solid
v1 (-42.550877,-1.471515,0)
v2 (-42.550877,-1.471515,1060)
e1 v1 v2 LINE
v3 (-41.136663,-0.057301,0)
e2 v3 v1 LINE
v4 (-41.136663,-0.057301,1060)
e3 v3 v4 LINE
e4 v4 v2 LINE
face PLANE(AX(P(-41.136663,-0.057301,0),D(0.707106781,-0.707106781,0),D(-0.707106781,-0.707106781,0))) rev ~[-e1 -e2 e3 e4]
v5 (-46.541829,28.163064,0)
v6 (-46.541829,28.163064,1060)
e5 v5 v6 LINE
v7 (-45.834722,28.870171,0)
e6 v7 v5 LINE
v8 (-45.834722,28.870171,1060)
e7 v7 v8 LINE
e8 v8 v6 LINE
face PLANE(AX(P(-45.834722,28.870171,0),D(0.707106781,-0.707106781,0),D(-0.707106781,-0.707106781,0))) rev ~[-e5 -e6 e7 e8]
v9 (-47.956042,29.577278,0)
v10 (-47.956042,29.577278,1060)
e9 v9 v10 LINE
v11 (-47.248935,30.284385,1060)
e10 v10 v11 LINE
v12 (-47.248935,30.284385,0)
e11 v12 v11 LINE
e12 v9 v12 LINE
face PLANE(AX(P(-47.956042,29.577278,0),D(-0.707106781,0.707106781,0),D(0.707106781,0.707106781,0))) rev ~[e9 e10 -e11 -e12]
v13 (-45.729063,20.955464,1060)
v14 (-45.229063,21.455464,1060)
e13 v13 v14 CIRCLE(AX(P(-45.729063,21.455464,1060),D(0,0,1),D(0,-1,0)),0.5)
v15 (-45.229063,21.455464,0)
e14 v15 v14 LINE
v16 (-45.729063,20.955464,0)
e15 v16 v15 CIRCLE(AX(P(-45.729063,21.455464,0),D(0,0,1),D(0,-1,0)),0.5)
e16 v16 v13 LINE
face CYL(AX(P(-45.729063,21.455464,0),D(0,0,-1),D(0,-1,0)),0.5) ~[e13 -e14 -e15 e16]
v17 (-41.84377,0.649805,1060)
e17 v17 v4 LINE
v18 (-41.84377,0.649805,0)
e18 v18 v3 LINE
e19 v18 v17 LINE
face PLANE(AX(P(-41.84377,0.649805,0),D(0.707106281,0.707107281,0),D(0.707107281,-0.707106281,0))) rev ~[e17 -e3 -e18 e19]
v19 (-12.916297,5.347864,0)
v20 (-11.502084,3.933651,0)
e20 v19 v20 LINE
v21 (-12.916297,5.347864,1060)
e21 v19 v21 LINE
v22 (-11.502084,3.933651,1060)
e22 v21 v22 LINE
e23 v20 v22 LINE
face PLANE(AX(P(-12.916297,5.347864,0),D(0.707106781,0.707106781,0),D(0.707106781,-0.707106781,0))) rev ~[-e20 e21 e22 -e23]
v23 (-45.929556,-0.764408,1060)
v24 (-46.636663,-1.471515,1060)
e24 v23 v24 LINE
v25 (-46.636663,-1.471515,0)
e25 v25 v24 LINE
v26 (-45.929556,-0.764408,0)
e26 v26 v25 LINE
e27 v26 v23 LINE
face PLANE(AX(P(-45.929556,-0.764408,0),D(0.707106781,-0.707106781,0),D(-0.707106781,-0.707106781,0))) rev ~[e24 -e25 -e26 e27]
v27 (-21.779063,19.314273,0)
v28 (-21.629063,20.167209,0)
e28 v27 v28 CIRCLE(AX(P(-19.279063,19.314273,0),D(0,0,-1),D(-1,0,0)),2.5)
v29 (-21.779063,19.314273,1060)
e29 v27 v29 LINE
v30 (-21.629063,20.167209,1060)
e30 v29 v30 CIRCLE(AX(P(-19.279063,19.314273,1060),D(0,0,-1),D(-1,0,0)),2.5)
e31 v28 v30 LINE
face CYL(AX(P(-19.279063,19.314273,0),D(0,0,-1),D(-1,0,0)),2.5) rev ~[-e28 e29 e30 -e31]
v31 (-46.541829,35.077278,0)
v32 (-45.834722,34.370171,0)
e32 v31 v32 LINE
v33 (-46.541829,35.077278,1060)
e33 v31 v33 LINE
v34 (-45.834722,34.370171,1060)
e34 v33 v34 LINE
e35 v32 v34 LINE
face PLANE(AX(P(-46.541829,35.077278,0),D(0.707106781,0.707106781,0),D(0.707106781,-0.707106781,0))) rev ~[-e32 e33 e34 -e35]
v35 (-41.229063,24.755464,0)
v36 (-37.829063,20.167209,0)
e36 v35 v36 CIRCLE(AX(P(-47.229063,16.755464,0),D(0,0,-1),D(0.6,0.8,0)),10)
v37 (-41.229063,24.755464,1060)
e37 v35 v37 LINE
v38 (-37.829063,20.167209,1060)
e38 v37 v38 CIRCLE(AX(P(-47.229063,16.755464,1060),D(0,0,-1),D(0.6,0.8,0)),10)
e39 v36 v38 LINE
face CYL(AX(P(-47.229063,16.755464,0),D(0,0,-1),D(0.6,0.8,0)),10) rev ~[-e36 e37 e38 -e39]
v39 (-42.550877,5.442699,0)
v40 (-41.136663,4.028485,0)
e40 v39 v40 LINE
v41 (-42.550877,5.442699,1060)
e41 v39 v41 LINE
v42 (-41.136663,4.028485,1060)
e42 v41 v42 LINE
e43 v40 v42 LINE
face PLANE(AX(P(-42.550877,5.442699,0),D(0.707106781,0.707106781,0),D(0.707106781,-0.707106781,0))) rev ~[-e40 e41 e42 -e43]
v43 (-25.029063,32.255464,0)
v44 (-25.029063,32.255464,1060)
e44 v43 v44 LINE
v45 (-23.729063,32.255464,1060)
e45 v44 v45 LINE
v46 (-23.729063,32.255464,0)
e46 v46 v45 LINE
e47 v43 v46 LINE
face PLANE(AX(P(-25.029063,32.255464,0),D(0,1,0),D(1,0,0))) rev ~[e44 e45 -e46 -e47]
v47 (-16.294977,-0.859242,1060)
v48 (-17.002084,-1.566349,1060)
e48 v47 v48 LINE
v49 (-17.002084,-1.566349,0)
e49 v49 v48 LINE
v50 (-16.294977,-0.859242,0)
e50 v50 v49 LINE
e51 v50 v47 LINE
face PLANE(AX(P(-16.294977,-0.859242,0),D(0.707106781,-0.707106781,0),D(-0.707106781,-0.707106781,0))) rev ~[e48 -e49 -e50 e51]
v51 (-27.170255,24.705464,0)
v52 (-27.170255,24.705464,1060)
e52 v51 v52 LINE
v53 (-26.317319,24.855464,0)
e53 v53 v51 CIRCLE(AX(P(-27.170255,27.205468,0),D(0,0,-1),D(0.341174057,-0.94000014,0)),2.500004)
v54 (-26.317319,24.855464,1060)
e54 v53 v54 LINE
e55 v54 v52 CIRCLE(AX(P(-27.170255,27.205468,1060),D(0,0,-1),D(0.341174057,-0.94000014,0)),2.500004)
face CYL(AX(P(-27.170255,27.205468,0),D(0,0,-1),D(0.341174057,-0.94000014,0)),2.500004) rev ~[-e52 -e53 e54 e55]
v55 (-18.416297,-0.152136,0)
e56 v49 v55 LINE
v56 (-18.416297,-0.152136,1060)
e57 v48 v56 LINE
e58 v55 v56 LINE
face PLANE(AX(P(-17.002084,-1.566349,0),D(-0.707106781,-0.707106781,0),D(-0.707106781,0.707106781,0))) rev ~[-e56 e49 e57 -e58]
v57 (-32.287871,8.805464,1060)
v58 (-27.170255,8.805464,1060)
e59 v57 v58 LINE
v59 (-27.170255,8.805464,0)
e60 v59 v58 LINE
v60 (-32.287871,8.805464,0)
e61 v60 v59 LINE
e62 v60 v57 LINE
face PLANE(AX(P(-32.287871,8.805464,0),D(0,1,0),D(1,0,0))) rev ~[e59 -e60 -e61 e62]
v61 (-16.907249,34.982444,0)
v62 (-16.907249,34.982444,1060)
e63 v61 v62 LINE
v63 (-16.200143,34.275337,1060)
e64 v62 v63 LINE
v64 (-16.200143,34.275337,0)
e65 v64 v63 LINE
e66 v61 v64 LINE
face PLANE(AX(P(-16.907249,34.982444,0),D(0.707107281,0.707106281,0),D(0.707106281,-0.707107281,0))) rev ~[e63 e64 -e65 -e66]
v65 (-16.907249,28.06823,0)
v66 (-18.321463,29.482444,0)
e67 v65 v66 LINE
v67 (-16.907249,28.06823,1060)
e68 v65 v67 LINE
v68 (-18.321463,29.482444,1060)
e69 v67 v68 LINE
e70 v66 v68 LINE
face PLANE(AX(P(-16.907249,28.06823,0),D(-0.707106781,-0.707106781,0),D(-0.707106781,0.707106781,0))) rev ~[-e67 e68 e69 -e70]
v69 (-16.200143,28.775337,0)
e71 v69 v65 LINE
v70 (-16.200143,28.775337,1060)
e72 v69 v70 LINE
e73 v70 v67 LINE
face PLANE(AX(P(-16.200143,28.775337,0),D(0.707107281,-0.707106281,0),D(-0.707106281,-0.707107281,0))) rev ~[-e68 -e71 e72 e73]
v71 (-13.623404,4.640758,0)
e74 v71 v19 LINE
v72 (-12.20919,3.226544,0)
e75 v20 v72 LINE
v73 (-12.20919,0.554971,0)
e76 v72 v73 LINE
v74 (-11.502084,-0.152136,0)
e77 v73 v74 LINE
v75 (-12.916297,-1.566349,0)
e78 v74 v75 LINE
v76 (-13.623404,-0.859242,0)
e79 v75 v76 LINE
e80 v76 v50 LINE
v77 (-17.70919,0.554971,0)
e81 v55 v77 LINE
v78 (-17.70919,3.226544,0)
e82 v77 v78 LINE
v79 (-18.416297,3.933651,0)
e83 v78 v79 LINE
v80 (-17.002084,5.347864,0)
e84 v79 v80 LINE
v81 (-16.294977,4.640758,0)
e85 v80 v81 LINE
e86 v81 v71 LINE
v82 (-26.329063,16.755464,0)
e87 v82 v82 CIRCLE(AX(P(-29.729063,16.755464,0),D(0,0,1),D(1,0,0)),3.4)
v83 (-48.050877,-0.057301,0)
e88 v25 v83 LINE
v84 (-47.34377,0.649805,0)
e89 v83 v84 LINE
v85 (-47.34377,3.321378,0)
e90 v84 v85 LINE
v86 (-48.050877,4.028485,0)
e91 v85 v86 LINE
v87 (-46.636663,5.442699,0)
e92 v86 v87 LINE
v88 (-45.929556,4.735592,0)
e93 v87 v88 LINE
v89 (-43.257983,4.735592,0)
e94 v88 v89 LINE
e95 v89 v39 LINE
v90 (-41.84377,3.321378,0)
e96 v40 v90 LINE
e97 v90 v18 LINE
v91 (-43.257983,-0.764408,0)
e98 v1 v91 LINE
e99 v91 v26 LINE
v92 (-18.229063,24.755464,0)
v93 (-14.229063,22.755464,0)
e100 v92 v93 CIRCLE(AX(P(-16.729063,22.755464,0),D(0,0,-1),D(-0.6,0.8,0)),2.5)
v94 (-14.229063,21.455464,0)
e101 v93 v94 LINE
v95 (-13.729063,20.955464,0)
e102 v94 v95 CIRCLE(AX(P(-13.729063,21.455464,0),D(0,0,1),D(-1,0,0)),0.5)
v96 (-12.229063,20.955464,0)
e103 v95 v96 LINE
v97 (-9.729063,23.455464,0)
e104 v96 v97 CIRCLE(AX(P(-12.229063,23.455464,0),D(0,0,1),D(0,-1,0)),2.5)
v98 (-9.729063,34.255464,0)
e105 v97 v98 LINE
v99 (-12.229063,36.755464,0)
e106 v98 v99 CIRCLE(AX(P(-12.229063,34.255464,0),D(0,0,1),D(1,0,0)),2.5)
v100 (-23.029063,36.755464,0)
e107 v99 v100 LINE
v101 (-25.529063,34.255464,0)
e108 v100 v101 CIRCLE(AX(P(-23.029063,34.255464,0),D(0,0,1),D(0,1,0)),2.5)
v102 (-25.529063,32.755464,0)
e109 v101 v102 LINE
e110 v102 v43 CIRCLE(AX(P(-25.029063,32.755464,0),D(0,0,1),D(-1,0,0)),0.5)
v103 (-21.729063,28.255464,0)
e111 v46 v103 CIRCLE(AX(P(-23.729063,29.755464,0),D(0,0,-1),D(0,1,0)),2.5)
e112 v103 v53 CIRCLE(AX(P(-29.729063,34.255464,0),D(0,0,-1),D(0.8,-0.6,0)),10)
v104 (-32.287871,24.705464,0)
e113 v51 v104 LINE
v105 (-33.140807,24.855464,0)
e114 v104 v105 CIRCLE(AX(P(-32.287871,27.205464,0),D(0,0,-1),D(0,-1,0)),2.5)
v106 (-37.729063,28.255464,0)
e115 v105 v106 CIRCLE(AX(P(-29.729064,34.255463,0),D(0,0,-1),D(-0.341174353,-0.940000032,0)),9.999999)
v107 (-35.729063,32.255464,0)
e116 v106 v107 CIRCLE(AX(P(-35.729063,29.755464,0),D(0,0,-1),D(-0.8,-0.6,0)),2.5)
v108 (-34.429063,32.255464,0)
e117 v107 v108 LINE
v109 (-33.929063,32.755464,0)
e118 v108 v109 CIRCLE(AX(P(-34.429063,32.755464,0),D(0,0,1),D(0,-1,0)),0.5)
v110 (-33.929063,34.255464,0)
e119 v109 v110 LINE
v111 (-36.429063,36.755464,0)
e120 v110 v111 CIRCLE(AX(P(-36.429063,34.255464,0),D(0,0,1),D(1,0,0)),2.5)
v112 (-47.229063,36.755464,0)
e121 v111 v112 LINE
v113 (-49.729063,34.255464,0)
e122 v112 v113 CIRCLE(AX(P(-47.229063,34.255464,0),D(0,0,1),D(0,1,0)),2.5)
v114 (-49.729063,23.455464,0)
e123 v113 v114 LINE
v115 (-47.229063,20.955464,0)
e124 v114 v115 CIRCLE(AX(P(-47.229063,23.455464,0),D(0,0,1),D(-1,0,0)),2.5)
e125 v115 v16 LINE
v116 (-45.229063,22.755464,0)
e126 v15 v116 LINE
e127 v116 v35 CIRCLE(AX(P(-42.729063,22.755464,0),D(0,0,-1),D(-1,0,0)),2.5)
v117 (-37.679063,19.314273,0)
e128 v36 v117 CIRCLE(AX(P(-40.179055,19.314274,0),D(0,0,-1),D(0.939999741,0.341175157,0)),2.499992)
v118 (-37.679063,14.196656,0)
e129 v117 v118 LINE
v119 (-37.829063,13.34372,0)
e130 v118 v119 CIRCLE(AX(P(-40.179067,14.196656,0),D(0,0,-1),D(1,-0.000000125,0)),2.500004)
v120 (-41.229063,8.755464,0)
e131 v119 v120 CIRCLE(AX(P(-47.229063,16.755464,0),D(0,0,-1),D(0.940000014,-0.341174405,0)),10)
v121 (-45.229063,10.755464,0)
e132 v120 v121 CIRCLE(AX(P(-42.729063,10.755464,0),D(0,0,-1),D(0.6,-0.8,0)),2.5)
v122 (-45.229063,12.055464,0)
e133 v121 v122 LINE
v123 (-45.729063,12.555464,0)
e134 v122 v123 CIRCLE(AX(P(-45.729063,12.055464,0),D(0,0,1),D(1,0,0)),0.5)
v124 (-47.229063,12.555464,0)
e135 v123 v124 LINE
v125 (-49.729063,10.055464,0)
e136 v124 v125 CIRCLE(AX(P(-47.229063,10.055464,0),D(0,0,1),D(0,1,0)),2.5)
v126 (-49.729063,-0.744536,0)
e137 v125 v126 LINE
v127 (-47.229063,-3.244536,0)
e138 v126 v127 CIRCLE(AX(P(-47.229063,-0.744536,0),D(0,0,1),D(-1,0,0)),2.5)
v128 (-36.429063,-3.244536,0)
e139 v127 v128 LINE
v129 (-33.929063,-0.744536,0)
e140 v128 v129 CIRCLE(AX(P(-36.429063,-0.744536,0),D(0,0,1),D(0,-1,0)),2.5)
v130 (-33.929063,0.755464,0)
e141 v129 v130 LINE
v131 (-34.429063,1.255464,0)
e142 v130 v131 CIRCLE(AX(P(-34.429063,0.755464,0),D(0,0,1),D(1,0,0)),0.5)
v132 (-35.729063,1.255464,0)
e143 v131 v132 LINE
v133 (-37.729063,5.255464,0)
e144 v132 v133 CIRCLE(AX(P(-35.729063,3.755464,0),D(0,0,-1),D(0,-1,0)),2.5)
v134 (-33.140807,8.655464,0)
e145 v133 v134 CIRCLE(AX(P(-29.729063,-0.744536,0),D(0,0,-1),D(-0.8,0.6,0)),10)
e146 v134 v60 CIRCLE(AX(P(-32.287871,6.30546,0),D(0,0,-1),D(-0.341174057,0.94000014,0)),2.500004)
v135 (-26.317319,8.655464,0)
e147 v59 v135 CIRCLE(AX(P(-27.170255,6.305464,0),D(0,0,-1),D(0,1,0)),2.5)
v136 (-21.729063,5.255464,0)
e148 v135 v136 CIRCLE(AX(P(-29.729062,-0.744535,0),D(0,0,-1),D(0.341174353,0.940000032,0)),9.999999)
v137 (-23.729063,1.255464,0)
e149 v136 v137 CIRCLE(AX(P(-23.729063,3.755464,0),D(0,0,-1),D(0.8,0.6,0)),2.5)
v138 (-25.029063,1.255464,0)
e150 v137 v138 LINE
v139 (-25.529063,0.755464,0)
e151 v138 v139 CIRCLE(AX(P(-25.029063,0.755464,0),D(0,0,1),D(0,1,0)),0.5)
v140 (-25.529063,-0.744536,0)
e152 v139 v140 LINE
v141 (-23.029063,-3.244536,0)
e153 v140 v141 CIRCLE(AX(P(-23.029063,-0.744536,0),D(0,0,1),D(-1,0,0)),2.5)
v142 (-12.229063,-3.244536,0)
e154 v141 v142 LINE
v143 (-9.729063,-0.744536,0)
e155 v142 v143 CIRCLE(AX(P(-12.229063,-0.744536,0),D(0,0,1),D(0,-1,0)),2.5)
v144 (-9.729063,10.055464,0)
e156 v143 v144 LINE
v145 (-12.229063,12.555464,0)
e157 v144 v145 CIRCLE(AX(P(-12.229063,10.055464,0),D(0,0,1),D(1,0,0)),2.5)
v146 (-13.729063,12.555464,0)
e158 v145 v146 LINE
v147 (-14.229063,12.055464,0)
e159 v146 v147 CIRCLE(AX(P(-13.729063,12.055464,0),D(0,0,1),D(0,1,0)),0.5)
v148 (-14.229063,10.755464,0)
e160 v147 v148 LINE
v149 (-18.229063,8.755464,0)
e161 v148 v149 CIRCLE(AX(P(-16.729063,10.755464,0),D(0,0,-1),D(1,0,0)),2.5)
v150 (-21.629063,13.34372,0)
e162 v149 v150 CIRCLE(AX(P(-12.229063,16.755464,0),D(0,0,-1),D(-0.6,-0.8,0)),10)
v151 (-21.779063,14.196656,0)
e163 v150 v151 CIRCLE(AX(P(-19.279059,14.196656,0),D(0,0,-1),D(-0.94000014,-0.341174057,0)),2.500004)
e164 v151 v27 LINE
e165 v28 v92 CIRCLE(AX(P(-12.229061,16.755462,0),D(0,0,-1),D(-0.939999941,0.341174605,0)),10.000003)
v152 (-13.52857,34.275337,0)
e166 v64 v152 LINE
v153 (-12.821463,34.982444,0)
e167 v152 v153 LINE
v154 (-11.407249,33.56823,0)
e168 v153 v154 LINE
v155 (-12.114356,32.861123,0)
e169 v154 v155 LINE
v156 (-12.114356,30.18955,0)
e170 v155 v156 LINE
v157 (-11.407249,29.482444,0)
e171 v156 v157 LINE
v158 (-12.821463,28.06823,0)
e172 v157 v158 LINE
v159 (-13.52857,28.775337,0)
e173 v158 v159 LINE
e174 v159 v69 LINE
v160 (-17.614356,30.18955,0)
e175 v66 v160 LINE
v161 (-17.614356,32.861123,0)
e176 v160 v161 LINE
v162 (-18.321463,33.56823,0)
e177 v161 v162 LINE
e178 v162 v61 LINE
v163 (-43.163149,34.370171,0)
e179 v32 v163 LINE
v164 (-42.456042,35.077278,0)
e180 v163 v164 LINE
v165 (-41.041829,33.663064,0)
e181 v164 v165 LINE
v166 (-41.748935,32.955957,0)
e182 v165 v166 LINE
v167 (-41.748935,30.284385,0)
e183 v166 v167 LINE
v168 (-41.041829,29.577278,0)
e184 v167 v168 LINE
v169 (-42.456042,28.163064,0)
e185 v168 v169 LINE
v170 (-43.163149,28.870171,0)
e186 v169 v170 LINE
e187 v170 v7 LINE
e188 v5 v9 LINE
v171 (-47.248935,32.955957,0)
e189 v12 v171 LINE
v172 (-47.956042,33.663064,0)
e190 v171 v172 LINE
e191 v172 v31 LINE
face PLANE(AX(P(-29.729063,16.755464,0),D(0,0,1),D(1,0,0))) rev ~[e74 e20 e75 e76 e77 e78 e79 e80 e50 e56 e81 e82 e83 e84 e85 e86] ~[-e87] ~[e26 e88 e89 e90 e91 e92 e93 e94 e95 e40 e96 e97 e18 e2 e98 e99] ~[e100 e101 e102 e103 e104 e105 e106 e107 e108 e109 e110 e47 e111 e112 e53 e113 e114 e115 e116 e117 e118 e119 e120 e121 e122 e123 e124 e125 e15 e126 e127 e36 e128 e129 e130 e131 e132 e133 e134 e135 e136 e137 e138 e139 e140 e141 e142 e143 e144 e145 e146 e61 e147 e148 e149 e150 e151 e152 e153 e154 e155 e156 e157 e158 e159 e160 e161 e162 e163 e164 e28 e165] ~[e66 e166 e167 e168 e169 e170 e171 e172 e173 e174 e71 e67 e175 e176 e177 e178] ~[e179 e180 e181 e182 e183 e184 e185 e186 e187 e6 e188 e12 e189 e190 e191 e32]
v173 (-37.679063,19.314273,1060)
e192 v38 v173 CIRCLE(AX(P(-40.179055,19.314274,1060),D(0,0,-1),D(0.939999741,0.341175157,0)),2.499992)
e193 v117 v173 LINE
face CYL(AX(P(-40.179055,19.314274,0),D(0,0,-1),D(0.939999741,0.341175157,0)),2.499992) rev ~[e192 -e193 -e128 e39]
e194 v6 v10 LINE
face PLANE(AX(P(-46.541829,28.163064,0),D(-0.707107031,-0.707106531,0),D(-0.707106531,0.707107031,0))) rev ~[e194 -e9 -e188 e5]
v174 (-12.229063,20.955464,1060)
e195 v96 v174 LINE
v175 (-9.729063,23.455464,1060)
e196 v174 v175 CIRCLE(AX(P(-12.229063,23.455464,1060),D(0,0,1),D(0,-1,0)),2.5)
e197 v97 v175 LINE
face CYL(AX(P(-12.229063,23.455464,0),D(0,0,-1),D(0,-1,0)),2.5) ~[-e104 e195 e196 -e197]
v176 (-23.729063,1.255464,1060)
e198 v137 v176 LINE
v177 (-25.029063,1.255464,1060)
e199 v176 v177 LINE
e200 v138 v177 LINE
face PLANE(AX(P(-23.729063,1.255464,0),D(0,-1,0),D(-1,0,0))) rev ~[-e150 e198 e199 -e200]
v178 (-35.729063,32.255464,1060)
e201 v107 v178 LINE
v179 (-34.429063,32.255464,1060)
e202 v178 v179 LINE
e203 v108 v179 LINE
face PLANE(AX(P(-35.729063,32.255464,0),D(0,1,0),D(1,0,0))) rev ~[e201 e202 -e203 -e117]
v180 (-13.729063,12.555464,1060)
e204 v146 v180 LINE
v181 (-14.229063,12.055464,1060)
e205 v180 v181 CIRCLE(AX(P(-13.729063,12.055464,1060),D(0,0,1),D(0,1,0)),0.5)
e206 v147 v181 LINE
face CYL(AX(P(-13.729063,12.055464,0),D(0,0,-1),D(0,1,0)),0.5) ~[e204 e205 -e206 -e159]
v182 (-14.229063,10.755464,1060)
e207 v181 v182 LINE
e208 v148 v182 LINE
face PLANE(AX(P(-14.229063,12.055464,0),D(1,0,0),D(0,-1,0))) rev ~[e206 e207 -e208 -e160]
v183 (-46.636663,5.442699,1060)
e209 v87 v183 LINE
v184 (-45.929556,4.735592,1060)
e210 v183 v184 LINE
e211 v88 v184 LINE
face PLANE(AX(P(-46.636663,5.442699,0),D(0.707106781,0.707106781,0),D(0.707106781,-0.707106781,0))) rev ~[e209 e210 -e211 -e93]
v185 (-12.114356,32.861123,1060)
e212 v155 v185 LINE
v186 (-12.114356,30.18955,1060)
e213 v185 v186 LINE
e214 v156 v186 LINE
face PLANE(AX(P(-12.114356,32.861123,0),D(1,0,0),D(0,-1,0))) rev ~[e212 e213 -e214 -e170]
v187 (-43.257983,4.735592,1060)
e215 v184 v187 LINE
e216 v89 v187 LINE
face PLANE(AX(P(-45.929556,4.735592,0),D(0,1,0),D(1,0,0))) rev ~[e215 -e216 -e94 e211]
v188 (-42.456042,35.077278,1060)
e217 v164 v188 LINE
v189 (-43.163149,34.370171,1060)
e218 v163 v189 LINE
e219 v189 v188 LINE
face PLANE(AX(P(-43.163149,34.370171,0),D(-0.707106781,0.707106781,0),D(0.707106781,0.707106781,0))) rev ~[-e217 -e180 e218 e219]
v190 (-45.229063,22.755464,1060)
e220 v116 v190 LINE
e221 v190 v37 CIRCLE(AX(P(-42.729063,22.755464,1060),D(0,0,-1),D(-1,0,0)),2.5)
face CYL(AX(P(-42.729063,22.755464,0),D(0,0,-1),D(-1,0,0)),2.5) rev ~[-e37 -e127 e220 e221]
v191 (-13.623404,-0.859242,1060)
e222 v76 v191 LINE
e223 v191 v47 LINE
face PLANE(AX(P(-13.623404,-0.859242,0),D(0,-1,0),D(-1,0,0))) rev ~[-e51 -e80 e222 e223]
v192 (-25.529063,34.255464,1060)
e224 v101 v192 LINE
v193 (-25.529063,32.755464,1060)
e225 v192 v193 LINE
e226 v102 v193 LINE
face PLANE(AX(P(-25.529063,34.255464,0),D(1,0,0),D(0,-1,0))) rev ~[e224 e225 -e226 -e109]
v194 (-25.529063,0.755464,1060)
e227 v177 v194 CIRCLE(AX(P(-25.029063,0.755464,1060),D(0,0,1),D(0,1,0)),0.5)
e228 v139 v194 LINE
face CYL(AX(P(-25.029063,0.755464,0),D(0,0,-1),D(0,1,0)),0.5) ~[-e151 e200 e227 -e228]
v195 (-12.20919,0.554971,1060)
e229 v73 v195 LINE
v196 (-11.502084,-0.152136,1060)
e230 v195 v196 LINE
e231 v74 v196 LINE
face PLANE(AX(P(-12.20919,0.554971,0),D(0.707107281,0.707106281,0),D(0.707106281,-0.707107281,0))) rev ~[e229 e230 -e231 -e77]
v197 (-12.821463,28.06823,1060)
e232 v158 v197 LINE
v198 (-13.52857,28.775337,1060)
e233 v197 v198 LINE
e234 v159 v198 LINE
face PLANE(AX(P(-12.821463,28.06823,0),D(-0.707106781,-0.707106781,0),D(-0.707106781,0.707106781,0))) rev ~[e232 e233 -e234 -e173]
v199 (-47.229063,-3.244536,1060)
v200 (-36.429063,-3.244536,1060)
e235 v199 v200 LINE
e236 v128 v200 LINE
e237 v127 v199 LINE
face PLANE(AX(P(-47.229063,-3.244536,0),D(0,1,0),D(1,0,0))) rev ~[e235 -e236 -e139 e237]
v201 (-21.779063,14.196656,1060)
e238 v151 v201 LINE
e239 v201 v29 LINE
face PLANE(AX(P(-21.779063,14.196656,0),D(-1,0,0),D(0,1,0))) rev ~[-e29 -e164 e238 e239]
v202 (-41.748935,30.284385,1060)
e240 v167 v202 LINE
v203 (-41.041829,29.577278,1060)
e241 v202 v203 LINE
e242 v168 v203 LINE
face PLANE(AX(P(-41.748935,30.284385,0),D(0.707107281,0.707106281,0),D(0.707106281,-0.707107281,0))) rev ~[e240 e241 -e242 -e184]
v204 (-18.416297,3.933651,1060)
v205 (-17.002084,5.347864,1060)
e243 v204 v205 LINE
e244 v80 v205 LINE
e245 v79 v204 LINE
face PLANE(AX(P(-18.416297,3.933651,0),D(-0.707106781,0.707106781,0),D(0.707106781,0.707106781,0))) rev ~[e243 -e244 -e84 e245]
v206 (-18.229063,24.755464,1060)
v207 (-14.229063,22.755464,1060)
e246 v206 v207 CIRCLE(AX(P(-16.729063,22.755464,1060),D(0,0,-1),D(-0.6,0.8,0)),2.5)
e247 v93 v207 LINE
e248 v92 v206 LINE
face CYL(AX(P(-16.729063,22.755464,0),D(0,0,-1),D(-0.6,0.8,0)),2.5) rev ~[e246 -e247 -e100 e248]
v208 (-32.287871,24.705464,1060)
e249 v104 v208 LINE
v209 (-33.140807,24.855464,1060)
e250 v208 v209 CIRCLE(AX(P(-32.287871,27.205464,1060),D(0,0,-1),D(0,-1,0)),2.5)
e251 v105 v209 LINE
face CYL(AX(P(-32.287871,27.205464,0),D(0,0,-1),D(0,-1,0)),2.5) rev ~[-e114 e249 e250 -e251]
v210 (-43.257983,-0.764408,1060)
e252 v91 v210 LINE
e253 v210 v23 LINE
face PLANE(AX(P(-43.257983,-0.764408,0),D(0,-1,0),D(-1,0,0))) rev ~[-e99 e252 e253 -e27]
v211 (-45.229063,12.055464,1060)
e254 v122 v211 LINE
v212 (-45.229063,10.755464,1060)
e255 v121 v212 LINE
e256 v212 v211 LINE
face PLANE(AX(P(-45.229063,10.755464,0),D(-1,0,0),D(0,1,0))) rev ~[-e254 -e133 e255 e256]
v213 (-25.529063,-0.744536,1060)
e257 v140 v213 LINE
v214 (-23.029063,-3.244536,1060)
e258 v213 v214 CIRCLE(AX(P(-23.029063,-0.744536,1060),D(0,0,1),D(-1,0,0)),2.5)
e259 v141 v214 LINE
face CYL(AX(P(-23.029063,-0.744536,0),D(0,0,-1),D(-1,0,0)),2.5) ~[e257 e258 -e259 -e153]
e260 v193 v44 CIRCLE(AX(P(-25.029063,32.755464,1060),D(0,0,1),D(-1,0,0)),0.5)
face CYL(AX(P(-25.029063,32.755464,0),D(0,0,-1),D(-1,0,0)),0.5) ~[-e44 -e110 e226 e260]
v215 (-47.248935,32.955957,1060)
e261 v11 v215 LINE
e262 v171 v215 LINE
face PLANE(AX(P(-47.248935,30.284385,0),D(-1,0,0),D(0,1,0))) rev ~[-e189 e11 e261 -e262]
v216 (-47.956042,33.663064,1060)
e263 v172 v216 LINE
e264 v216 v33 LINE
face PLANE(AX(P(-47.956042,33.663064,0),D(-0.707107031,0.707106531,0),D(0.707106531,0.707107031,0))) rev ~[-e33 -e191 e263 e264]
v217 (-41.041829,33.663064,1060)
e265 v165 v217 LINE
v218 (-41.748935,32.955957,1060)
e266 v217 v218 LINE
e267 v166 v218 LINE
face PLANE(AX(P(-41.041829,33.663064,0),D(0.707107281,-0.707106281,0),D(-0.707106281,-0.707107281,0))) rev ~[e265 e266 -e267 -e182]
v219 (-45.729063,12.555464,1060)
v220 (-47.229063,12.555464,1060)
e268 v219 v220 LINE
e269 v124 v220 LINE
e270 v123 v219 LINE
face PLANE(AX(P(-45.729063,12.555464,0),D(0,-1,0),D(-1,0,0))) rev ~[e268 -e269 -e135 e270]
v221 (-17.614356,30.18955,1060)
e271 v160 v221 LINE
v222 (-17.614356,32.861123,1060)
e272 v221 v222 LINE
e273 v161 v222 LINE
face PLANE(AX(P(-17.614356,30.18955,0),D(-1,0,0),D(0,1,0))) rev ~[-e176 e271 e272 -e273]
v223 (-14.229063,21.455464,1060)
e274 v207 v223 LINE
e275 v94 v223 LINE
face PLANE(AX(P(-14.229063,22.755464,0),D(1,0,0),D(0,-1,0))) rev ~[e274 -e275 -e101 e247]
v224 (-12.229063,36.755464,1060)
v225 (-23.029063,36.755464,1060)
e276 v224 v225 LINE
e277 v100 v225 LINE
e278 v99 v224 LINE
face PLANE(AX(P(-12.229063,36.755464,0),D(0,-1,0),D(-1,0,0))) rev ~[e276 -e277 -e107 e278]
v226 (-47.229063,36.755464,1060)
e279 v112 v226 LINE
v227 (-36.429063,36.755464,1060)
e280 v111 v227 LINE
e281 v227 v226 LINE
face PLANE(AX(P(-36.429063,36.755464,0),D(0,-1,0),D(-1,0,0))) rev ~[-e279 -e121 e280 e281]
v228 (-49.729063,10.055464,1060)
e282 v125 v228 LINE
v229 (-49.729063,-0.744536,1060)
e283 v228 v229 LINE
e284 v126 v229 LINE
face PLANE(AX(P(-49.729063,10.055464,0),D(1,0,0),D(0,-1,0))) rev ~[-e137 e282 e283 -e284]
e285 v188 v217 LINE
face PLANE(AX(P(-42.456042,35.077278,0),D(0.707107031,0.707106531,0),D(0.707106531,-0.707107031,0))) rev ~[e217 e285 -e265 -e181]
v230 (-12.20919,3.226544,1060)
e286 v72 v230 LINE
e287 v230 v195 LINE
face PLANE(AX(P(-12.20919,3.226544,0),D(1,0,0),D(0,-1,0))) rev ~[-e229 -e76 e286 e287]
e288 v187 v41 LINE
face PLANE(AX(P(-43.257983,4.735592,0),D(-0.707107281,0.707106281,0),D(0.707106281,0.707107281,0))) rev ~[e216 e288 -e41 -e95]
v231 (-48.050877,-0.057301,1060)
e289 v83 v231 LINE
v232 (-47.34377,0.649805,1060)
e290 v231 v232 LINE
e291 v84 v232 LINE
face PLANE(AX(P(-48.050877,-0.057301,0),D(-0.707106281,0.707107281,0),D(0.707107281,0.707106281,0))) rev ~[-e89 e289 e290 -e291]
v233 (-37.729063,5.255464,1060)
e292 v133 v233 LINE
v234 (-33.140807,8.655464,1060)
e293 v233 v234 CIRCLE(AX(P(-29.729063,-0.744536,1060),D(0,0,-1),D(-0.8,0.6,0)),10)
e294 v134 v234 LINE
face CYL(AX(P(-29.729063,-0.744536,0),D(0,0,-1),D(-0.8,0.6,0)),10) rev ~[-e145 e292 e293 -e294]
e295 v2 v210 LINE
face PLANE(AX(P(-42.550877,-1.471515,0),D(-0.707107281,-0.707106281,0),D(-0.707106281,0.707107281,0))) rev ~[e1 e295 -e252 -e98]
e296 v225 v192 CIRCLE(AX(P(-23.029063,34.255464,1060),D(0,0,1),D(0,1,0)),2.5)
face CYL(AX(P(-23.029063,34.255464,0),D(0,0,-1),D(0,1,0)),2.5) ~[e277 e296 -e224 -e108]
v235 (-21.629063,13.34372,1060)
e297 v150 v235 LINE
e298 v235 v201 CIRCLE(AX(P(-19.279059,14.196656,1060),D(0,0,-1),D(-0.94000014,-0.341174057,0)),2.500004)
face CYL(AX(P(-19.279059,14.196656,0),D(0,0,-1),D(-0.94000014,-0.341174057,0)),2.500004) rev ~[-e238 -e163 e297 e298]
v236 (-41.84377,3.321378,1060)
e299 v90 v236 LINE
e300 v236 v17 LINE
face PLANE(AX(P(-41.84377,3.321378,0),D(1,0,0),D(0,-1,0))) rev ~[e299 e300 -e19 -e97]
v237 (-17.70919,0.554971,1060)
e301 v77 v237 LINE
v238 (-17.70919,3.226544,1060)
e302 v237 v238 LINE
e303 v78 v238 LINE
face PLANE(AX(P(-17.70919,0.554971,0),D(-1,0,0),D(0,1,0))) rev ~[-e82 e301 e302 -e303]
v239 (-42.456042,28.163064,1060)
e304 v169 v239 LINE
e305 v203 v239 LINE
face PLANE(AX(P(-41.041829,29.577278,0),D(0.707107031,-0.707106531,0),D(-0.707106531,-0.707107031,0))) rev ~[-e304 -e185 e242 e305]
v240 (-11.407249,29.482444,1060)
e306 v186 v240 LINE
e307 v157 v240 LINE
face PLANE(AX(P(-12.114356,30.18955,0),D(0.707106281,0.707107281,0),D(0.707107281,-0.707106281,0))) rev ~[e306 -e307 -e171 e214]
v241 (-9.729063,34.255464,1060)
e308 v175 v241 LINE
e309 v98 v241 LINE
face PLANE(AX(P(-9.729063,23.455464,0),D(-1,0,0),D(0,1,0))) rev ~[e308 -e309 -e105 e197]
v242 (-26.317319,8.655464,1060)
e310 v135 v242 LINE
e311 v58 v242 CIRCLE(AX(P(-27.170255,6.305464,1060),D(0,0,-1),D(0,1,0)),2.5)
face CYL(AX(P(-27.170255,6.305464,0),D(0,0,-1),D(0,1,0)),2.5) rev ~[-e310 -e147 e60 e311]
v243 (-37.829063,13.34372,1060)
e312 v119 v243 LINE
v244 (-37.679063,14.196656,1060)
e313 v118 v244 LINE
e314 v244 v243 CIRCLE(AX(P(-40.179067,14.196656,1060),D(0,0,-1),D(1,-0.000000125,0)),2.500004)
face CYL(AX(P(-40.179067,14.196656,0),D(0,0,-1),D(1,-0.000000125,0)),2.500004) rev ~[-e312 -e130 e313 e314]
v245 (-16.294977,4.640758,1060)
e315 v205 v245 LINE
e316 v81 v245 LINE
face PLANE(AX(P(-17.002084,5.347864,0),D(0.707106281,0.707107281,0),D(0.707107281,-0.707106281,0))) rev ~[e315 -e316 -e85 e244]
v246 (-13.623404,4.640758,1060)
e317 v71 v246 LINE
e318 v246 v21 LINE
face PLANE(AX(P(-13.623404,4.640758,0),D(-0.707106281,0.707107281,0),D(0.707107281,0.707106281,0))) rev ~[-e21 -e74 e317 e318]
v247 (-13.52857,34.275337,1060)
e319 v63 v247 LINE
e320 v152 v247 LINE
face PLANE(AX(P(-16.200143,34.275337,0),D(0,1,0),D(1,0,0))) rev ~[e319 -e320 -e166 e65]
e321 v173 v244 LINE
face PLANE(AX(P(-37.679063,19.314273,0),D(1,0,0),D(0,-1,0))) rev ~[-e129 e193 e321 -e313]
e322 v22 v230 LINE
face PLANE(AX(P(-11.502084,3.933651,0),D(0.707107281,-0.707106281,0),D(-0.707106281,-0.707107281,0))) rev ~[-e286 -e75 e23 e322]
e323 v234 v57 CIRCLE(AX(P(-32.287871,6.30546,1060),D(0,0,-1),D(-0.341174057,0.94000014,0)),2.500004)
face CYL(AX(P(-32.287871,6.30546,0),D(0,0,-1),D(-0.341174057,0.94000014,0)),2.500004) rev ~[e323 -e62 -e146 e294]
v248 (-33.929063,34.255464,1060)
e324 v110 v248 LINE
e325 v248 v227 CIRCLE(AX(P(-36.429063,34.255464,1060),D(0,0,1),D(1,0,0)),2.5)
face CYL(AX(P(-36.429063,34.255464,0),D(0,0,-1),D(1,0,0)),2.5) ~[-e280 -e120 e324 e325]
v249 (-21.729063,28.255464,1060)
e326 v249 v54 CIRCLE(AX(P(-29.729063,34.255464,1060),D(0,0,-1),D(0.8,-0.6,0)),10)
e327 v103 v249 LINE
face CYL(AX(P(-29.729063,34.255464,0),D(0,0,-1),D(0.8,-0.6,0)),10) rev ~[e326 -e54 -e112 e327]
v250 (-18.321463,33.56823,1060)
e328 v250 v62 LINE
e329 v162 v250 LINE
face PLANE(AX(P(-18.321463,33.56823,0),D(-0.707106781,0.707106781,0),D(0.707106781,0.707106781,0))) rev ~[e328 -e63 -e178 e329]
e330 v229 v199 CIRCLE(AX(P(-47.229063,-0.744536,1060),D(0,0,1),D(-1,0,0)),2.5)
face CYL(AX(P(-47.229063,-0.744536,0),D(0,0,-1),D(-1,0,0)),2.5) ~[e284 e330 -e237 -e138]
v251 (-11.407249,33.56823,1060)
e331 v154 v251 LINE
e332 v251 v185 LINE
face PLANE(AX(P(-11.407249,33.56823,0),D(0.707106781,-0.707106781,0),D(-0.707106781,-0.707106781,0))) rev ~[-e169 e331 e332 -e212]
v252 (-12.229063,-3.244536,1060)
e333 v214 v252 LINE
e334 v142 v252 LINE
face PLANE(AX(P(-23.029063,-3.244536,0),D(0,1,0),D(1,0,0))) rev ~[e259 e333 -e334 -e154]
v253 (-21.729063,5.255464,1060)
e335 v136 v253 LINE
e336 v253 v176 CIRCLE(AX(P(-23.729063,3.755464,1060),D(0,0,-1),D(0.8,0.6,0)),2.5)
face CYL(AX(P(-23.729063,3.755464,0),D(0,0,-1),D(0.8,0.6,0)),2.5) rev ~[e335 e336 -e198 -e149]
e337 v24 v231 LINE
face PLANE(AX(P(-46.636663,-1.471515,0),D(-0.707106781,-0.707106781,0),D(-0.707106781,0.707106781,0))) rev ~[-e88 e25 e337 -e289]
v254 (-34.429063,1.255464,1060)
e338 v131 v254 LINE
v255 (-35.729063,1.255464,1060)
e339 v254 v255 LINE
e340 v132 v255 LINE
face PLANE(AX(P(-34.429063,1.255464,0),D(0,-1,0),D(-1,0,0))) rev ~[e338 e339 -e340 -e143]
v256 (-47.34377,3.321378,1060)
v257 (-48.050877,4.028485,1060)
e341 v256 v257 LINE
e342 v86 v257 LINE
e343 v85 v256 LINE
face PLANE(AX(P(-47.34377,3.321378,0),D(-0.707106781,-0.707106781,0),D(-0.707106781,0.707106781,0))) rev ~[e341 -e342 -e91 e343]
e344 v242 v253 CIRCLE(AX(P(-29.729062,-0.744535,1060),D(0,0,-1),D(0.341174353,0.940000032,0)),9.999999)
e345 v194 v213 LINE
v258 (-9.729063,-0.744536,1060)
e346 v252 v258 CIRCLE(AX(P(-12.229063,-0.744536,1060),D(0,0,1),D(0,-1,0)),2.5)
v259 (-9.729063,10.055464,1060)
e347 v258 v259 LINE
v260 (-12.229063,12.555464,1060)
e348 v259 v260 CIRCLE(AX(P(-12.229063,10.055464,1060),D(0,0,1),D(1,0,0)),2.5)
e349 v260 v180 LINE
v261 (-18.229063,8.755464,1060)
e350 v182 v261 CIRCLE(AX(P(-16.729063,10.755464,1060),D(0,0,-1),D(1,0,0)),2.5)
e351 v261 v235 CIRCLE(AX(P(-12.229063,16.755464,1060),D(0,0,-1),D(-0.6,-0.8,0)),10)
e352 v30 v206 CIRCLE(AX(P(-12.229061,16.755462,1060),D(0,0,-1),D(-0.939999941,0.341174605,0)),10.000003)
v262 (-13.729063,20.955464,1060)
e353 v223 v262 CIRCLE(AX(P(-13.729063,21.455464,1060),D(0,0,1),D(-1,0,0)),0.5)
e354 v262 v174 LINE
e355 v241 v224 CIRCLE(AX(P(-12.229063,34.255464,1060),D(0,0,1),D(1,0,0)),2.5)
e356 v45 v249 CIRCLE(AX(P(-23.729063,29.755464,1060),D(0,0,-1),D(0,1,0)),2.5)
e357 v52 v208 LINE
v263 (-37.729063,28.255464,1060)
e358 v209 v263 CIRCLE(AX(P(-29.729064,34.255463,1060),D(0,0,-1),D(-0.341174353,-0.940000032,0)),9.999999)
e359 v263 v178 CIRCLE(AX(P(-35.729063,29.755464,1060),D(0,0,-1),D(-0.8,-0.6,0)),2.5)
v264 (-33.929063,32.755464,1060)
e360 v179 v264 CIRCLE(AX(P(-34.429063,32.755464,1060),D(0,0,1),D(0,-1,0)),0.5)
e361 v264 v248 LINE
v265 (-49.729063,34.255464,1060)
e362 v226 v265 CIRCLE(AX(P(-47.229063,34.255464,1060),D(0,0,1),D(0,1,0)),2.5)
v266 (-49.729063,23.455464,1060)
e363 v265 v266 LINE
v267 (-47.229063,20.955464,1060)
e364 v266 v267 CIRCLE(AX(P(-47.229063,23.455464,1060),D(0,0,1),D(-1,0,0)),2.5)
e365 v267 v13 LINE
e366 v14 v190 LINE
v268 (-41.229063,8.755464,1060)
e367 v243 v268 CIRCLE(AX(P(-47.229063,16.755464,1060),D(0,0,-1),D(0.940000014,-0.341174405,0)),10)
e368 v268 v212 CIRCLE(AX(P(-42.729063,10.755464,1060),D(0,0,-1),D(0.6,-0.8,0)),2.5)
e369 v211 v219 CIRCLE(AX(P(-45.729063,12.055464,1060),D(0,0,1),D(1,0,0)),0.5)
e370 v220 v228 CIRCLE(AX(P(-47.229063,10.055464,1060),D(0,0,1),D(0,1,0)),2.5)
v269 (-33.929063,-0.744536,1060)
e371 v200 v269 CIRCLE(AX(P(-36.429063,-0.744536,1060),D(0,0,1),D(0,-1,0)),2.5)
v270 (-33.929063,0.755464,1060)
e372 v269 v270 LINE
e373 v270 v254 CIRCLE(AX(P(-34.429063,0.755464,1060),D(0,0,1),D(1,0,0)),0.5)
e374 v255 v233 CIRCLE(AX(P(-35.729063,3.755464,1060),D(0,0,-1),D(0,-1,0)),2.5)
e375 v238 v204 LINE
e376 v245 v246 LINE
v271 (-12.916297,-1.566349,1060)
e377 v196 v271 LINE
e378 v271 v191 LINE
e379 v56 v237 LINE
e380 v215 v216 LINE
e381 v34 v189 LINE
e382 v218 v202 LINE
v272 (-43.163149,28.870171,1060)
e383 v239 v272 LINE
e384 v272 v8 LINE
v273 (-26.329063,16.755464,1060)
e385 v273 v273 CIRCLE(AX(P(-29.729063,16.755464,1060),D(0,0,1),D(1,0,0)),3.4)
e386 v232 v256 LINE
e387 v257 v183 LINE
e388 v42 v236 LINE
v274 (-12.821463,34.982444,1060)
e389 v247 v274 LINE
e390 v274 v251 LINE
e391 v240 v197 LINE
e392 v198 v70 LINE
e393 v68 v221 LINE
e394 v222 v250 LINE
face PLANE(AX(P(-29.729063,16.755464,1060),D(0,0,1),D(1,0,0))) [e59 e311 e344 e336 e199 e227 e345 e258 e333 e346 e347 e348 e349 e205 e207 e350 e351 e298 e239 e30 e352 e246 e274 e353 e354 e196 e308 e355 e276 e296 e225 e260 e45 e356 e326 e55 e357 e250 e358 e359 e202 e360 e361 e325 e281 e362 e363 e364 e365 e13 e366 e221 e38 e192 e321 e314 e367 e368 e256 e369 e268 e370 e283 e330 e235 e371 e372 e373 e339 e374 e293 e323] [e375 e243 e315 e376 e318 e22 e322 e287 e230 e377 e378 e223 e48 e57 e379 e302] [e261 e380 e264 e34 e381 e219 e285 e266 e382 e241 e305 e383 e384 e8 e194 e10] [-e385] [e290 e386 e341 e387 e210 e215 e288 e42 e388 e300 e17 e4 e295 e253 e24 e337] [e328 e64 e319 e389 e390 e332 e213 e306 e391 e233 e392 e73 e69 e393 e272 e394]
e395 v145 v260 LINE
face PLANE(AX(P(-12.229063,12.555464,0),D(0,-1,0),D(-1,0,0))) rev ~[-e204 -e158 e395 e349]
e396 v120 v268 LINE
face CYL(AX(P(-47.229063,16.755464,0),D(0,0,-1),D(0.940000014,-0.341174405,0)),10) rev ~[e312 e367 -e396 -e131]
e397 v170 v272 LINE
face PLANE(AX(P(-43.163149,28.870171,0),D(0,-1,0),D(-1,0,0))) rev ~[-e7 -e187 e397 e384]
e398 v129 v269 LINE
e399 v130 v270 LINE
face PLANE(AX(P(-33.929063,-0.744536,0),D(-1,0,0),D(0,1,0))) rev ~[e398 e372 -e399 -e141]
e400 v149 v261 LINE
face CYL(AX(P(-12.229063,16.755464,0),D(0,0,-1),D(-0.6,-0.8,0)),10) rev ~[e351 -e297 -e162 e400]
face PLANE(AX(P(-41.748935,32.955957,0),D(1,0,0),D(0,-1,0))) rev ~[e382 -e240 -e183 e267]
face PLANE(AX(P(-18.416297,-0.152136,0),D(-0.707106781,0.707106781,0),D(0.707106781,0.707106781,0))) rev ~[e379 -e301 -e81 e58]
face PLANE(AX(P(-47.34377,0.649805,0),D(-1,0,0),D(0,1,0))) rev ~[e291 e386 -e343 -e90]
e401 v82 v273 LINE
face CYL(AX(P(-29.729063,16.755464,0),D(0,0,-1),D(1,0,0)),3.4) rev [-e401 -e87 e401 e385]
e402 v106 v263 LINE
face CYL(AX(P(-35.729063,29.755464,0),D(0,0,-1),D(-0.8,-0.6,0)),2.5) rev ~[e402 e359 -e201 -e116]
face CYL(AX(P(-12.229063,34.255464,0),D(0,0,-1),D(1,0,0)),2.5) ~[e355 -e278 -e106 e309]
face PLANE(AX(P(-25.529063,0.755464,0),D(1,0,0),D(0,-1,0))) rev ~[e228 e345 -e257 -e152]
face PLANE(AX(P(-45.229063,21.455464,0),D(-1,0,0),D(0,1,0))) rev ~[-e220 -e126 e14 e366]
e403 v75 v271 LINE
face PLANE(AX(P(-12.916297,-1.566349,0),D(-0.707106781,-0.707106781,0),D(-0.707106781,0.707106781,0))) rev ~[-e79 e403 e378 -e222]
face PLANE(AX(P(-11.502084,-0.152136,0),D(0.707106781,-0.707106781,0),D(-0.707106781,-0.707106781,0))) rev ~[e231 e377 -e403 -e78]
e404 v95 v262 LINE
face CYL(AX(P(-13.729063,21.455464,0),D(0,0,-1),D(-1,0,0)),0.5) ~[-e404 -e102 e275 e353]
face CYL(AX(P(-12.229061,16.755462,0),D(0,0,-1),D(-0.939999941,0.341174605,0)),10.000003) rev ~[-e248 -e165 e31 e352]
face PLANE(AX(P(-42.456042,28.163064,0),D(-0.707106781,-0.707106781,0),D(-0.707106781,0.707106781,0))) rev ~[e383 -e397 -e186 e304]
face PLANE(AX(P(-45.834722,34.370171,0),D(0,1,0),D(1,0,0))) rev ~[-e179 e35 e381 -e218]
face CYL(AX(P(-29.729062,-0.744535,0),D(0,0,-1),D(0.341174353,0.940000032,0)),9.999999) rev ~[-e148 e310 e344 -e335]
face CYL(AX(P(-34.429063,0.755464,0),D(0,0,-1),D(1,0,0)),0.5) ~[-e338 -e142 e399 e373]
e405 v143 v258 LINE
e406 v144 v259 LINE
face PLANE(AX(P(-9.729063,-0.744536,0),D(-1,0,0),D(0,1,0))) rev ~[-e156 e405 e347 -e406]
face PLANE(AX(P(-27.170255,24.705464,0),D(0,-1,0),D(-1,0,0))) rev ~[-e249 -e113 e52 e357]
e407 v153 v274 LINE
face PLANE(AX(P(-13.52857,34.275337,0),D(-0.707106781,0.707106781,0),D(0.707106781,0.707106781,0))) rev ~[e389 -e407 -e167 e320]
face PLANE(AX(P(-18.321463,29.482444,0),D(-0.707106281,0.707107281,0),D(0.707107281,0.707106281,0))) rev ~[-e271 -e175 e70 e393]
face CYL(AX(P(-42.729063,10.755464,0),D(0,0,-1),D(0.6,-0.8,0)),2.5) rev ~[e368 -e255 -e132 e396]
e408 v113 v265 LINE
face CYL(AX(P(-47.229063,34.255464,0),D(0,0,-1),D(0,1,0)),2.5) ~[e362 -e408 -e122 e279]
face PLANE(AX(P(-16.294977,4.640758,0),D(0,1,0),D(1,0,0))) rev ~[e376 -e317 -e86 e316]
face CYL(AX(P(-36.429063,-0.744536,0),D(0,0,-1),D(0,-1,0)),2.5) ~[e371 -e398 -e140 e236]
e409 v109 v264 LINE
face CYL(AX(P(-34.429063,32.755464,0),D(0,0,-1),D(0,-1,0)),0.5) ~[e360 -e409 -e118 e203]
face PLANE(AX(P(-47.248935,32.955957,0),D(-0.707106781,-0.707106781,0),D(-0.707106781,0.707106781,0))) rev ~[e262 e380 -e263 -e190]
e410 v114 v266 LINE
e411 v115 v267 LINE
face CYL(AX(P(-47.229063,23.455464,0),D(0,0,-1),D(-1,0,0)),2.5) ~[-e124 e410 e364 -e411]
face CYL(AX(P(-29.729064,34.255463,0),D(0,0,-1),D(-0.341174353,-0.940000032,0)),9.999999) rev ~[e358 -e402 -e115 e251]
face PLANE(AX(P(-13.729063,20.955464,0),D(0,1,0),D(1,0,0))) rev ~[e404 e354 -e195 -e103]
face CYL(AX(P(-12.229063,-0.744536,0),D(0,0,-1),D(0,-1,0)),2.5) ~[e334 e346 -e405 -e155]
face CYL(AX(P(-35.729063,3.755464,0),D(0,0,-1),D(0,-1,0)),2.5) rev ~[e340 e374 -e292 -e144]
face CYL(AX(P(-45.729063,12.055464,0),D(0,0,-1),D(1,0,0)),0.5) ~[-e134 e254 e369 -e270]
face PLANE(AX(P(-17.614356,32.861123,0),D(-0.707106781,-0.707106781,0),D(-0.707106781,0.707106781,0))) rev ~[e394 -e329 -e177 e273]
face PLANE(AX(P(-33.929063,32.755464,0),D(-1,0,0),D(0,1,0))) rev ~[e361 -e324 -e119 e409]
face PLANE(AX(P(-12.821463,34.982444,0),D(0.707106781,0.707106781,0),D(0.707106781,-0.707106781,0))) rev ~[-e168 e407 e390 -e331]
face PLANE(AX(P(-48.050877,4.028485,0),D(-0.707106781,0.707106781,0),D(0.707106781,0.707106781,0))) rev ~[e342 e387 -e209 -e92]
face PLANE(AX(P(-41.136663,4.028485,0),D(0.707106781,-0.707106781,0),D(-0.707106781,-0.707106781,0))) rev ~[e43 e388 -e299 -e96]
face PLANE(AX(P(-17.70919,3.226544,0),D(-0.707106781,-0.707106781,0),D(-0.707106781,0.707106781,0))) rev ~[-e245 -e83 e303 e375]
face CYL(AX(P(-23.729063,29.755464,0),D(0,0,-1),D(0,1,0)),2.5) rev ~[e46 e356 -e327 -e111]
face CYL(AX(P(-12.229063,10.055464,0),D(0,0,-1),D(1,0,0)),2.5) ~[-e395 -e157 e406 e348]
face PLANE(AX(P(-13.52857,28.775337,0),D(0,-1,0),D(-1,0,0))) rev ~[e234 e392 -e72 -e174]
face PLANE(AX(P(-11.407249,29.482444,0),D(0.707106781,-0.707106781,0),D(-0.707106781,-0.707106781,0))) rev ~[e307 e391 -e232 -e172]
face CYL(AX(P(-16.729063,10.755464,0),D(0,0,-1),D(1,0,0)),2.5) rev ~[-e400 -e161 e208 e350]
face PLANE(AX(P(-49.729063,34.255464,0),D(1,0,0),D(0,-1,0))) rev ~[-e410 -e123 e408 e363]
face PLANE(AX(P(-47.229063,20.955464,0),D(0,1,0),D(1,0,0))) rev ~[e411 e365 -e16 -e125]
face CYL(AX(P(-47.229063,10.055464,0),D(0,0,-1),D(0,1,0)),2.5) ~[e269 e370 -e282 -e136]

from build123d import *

# Parameters (mm, degrees)
F0_R     = 3.4
F1_DEPTH = 1060


# Not quite as in the source:
# - ends of sketch curves that miss each other by under 0.0002 mm in the source are joined


with BuildPart() as f1:
    # F0 (on Top) → F1 (new body)
    with BuildSketch(Plane.XY):
        with BuildLine():
            ThreePointArc((-37.8290628647, 13.3437199509), (-39.194573333, 10.8017277117), (-41.229063, 8.755464))
            ThreePointArc((-41.229063, 8.755464), (-43.8470969887, 8.5193960225), (-45.229063, 10.755464))
            Line((-45.229063, 10.755464), (-45.229063, 12.055464))
            ThreePointArc((-45.229063, 12.055464), (-45.3755096094, 12.4090173906), (-45.729063, 12.555464))
            Line((-45.729063, 12.555464), (-47.229063, 12.555464))
            ThreePointArc((-47.229063, 12.555464), (-48.996829953, 11.823230953), (-49.729063, 10.055464))
            Line((-49.729063, 10.055464), (-49.729063, -0.744536))
            ThreePointArc((-49.729063, -0.744536), (-48.996829953, -2.512302953), (-47.229063, -3.244536))
            Line((-47.229063, -3.244536), (-36.429063, -3.244536))
            ThreePointArc((-36.429063, -3.244536), (-34.661296047, -2.512302953), (-33.929063, -0.744536))
            Line((-33.929063, -0.744536), (-33.929063, 0.755464))
            ThreePointArc((-33.929063, 0.755464), (-34.0755096094, 1.1090173906), (-34.429063, 1.255464))
            Line((-34.429063, 1.255464), (-35.729063, 1.255464))
            ThreePointArc((-35.729063, 1.255464), (-37.9651309775, 2.6374300113), (-37.729063, 5.255464))
            ThreePointArc((-37.729063, 5.255464), (-35.6827992883, 7.289953667), (-33.1408070491, 8.6554641353))
            ThreePointArc((-33.1408070491, 8.6554641353), (-32.7208836531, 8.767678459), (-32.287871, 8.805464))
            Line((-32.287871, 8.805464), (-27.170255, 8.805464))
            ThreePointArc((-27.170255, 8.805464), (-26.7372423469, 8.767678459), (-26.3173189877, 8.6554640338))
            ThreePointArc((-26.3173189877, 8.6554640338), (-23.7753267117, 7.289953667), (-21.729063, 5.255464))
            ThreePointArc((-21.729063, 5.255464), (-21.4929950225, 2.6374300113), (-23.729063, 1.255464))
            Line((-23.729063, 1.255464), (-25.029063, 1.255464))
            ThreePointArc((-25.029063, 1.255464), (-25.3826163906, 1.1090173906), (-25.529063, 0.755464))
            Line((-25.529063, 0.755464), (-25.529063, -0.744536))
            ThreePointArc((-25.529063, -0.744536), (-24.796829953, -2.512302953), (-23.029063, -3.244536))
            Line((-23.029063, -3.244536), (-12.229063, -3.244536))
            ThreePointArc((-12.229063, -3.244536), (-10.461296047, -2.512302953), (-9.729063, -0.744536))
            Line((-9.729063, -0.744536), (-9.729063, 10.055464))
            ThreePointArc((-9.729063, 10.055464), (-10.461296047, 11.823230953), (-12.229063, 12.555464))
            Line((-12.229063, 12.555464), (-13.729063, 12.555464))
            ThreePointArc((-13.729063, 12.555464), (-14.0826163906, 12.4090173906), (-14.229063, 12.055464))
            Line((-14.229063, 12.055464), (-14.229063, 10.755464))
            ThreePointArc((-14.229063, 10.755464), (-15.6110290113, 8.5193960225), (-18.229063, 8.755464))
            ThreePointArc((-18.229063, 8.755464), (-20.263552667, 10.8017277117), (-21.6290631353, 13.3437199509))
            ThreePointArc((-21.6290631353, 13.3437199509), (-21.741277459, 13.7636433469), (-21.779063, 14.196656))
            Line((-21.779063, 14.196656), (-21.779063, 19.314273))
            ThreePointArc((-21.779063, 19.314273), (-21.741277459, 19.7472856531), (-21.6290630338, 20.1672090123))
            ThreePointArc((-21.6290630338, 20.1672090123), (-20.2635523872, 22.7092006659), (-18.229063, 24.755464))
            ThreePointArc((-18.229063, 24.755464), (-15.6110290113, 24.9915319775), (-14.229063, 22.755464))
            Line((-14.229063, 22.755464), (-14.229063, 21.455464))
            ThreePointArc((-14.229063, 21.455464), (-14.0826163906, 21.1019106094), (-13.729063, 20.955464))
            Line((-13.729063, 20.955464), (-12.229063, 20.955464))
            ThreePointArc((-12.229063, 20.955464), (-10.461296047, 21.687697047), (-9.729063, 23.455464))
            Line((-9.729063, 23.455464), (-9.729063, 34.255464))
            ThreePointArc((-9.729063, 34.255464), (-10.461296047, 36.023230953), (-12.229063, 36.755464))
            Line((-12.229063, 36.755464), (-23.029063, 36.755464))
            ThreePointArc((-23.029063, 36.755464), (-24.796829953, 36.023230953), (-25.529063, 34.255464))
            Line((-25.529063, 34.255464), (-25.529063, 32.755464))
            ThreePointArc((-25.529063, 32.755464), (-25.3826163906, 32.4019106094), (-25.029063, 32.255464))
            Line((-25.029063, 32.255464), (-23.729063, 32.255464))
            ThreePointArc((-23.729063, 32.255464), (-21.4929950225, 30.8734979887), (-21.729063, 28.255464))
            ThreePointArc((-21.729063, 28.255464), (-23.7753267117, 26.220974333), (-26.3173189509, 24.8554638647))
            ThreePointArc((-26.3173189509, 24.8554638647), (-26.7372423469, 24.743249541), (-27.170255, 24.705464))
            Line((-27.170255, 24.705464), (-32.287871, 24.705464))
            ThreePointArc((-32.287871, 24.705464), (-32.7208836531, 24.743249541), (-33.1408070123, 24.8554639662))
            ThreePointArc((-33.1408070123, 24.8554639662), (-35.6827992883, 26.220974333), (-37.729063, 28.255464))
            ThreePointArc((-37.729063, 28.255464), (-37.9651309775, 30.8734979887), (-35.729063, 32.255464))
            Line((-35.729063, 32.255464), (-34.429063, 32.255464))
            ThreePointArc((-34.429063, 32.255464), (-34.0755096094, 32.4019106094), (-33.929063, 32.755464))
            Line((-33.929063, 32.755464), (-33.929063, 34.255464))
            ThreePointArc((-33.929063, 34.255464), (-34.661296047, 36.023230953), (-36.429063, 36.755464))
            Line((-36.429063, 36.755464), (-47.229063, 36.755464))
            ThreePointArc((-47.229063, 36.755464), (-48.996829953, 36.023230953), (-49.729063, 34.255464))
            Line((-49.729063, 34.255464), (-49.729063, 23.455464))
            ThreePointArc((-49.729063, 23.455464), (-48.996829953, 21.687697047), (-47.229063, 20.955464))
            Line((-47.229063, 20.955464), (-45.729063, 20.955464))
            ThreePointArc((-45.729063, 20.955464), (-45.3755096094, 21.1019106094), (-45.229063, 21.455464))
            Line((-45.229063, 21.455464), (-45.229063, 22.755464))
            ThreePointArc((-45.229063, 22.755464), (-43.8470969887, 24.9915319775), (-41.229063, 24.755464))
            ThreePointArc((-41.229063, 24.755464), (-39.1945736128, 22.7092006659), (-37.8290631854, 20.1672089327))
            ThreePointArc((-37.8290631854, 20.1672089327), (-37.716848541, 19.7472856531), (-37.679063, 19.314273))
            Line((-37.679063, 19.314273), (-37.679063, 14.196656))
            ThreePointArc((-37.679063, 14.196656), (-37.716848541, 13.7636433469), (-37.8290628647, 13.3437199509))
        make_face()
        Polygon((-43.257983, -0.764408), (-45.929556, -0.764408), (-46.636663, -1.471515), (-48.050877, -0.057301), (-47.34377, 0.649805), (-47.34377, 3.321378), (-48.050877, 4.028485), (-46.636663, 5.442699), (-45.929556, 4.735592), (-43.257983, 4.735592), (-42.550877, 5.442699), (-41.136663, 4.028485), (-41.84377, 3.321378), (-41.84377, 0.649805), (-41.136663, -0.057301), (-42.550877, -1.471515), align=None, mode=Mode.SUBTRACT)
        Polygon((-12.20919, 3.226544), (-12.20919, 0.554971), (-11.502084, -0.152136), (-12.916297, -1.566349), (-13.623404, -0.859242), (-16.294977, -0.859242), (-17.002084, -1.566349), (-18.416297, -0.152136), (-17.70919, 0.554971), (-17.70919, 3.226544), (-18.416297, 3.933651), (-17.002084, 5.347864), (-16.294977, 4.640758), (-13.623404, 4.640758), (-12.916297, 5.347864), (-11.502084, 3.933651), align=None, mode=Mode.SUBTRACT)
        with Locations((-29.729063, 16.755464)):
            Circle(F0_R, mode=Mode.SUBTRACT)
        Polygon((-47.248935, 30.284385), (-47.248935, 32.955957), (-47.956042, 33.663064), (-46.541829, 35.077278), (-45.834722, 34.370171), (-43.163149, 34.370171), (-42.456042, 35.077278), (-41.041829, 33.663064), (-41.748935, 32.955957), (-41.748935, 30.284385), (-41.041829, 29.577278), (-42.456042, 28.163064), (-43.163149, 28.870171), (-45.834722, 28.870171), (-46.541829, 28.163064), (-47.956042, 29.577278), align=None, mode=Mode.SUBTRACT)
        Polygon((-16.200143, 34.275337), (-13.52857, 34.275337), (-12.821463, 34.982444), (-11.407249, 33.56823), (-12.114356, 32.861123), (-12.114356, 30.18955), (-11.407249, 29.482444), (-12.821463, 28.06823), (-13.52857, 28.775337), (-16.200143, 28.775337), (-16.907249, 28.06823), (-18.321463, 29.482444), (-17.614356, 30.18955), (-17.614356, 32.861123), (-18.321463, 33.56823), (-16.907249, 34.982444), align=None, mode=Mode.SUBTRACT)
    extrude(amount=F1_DEPTH)


solid = f1.part
